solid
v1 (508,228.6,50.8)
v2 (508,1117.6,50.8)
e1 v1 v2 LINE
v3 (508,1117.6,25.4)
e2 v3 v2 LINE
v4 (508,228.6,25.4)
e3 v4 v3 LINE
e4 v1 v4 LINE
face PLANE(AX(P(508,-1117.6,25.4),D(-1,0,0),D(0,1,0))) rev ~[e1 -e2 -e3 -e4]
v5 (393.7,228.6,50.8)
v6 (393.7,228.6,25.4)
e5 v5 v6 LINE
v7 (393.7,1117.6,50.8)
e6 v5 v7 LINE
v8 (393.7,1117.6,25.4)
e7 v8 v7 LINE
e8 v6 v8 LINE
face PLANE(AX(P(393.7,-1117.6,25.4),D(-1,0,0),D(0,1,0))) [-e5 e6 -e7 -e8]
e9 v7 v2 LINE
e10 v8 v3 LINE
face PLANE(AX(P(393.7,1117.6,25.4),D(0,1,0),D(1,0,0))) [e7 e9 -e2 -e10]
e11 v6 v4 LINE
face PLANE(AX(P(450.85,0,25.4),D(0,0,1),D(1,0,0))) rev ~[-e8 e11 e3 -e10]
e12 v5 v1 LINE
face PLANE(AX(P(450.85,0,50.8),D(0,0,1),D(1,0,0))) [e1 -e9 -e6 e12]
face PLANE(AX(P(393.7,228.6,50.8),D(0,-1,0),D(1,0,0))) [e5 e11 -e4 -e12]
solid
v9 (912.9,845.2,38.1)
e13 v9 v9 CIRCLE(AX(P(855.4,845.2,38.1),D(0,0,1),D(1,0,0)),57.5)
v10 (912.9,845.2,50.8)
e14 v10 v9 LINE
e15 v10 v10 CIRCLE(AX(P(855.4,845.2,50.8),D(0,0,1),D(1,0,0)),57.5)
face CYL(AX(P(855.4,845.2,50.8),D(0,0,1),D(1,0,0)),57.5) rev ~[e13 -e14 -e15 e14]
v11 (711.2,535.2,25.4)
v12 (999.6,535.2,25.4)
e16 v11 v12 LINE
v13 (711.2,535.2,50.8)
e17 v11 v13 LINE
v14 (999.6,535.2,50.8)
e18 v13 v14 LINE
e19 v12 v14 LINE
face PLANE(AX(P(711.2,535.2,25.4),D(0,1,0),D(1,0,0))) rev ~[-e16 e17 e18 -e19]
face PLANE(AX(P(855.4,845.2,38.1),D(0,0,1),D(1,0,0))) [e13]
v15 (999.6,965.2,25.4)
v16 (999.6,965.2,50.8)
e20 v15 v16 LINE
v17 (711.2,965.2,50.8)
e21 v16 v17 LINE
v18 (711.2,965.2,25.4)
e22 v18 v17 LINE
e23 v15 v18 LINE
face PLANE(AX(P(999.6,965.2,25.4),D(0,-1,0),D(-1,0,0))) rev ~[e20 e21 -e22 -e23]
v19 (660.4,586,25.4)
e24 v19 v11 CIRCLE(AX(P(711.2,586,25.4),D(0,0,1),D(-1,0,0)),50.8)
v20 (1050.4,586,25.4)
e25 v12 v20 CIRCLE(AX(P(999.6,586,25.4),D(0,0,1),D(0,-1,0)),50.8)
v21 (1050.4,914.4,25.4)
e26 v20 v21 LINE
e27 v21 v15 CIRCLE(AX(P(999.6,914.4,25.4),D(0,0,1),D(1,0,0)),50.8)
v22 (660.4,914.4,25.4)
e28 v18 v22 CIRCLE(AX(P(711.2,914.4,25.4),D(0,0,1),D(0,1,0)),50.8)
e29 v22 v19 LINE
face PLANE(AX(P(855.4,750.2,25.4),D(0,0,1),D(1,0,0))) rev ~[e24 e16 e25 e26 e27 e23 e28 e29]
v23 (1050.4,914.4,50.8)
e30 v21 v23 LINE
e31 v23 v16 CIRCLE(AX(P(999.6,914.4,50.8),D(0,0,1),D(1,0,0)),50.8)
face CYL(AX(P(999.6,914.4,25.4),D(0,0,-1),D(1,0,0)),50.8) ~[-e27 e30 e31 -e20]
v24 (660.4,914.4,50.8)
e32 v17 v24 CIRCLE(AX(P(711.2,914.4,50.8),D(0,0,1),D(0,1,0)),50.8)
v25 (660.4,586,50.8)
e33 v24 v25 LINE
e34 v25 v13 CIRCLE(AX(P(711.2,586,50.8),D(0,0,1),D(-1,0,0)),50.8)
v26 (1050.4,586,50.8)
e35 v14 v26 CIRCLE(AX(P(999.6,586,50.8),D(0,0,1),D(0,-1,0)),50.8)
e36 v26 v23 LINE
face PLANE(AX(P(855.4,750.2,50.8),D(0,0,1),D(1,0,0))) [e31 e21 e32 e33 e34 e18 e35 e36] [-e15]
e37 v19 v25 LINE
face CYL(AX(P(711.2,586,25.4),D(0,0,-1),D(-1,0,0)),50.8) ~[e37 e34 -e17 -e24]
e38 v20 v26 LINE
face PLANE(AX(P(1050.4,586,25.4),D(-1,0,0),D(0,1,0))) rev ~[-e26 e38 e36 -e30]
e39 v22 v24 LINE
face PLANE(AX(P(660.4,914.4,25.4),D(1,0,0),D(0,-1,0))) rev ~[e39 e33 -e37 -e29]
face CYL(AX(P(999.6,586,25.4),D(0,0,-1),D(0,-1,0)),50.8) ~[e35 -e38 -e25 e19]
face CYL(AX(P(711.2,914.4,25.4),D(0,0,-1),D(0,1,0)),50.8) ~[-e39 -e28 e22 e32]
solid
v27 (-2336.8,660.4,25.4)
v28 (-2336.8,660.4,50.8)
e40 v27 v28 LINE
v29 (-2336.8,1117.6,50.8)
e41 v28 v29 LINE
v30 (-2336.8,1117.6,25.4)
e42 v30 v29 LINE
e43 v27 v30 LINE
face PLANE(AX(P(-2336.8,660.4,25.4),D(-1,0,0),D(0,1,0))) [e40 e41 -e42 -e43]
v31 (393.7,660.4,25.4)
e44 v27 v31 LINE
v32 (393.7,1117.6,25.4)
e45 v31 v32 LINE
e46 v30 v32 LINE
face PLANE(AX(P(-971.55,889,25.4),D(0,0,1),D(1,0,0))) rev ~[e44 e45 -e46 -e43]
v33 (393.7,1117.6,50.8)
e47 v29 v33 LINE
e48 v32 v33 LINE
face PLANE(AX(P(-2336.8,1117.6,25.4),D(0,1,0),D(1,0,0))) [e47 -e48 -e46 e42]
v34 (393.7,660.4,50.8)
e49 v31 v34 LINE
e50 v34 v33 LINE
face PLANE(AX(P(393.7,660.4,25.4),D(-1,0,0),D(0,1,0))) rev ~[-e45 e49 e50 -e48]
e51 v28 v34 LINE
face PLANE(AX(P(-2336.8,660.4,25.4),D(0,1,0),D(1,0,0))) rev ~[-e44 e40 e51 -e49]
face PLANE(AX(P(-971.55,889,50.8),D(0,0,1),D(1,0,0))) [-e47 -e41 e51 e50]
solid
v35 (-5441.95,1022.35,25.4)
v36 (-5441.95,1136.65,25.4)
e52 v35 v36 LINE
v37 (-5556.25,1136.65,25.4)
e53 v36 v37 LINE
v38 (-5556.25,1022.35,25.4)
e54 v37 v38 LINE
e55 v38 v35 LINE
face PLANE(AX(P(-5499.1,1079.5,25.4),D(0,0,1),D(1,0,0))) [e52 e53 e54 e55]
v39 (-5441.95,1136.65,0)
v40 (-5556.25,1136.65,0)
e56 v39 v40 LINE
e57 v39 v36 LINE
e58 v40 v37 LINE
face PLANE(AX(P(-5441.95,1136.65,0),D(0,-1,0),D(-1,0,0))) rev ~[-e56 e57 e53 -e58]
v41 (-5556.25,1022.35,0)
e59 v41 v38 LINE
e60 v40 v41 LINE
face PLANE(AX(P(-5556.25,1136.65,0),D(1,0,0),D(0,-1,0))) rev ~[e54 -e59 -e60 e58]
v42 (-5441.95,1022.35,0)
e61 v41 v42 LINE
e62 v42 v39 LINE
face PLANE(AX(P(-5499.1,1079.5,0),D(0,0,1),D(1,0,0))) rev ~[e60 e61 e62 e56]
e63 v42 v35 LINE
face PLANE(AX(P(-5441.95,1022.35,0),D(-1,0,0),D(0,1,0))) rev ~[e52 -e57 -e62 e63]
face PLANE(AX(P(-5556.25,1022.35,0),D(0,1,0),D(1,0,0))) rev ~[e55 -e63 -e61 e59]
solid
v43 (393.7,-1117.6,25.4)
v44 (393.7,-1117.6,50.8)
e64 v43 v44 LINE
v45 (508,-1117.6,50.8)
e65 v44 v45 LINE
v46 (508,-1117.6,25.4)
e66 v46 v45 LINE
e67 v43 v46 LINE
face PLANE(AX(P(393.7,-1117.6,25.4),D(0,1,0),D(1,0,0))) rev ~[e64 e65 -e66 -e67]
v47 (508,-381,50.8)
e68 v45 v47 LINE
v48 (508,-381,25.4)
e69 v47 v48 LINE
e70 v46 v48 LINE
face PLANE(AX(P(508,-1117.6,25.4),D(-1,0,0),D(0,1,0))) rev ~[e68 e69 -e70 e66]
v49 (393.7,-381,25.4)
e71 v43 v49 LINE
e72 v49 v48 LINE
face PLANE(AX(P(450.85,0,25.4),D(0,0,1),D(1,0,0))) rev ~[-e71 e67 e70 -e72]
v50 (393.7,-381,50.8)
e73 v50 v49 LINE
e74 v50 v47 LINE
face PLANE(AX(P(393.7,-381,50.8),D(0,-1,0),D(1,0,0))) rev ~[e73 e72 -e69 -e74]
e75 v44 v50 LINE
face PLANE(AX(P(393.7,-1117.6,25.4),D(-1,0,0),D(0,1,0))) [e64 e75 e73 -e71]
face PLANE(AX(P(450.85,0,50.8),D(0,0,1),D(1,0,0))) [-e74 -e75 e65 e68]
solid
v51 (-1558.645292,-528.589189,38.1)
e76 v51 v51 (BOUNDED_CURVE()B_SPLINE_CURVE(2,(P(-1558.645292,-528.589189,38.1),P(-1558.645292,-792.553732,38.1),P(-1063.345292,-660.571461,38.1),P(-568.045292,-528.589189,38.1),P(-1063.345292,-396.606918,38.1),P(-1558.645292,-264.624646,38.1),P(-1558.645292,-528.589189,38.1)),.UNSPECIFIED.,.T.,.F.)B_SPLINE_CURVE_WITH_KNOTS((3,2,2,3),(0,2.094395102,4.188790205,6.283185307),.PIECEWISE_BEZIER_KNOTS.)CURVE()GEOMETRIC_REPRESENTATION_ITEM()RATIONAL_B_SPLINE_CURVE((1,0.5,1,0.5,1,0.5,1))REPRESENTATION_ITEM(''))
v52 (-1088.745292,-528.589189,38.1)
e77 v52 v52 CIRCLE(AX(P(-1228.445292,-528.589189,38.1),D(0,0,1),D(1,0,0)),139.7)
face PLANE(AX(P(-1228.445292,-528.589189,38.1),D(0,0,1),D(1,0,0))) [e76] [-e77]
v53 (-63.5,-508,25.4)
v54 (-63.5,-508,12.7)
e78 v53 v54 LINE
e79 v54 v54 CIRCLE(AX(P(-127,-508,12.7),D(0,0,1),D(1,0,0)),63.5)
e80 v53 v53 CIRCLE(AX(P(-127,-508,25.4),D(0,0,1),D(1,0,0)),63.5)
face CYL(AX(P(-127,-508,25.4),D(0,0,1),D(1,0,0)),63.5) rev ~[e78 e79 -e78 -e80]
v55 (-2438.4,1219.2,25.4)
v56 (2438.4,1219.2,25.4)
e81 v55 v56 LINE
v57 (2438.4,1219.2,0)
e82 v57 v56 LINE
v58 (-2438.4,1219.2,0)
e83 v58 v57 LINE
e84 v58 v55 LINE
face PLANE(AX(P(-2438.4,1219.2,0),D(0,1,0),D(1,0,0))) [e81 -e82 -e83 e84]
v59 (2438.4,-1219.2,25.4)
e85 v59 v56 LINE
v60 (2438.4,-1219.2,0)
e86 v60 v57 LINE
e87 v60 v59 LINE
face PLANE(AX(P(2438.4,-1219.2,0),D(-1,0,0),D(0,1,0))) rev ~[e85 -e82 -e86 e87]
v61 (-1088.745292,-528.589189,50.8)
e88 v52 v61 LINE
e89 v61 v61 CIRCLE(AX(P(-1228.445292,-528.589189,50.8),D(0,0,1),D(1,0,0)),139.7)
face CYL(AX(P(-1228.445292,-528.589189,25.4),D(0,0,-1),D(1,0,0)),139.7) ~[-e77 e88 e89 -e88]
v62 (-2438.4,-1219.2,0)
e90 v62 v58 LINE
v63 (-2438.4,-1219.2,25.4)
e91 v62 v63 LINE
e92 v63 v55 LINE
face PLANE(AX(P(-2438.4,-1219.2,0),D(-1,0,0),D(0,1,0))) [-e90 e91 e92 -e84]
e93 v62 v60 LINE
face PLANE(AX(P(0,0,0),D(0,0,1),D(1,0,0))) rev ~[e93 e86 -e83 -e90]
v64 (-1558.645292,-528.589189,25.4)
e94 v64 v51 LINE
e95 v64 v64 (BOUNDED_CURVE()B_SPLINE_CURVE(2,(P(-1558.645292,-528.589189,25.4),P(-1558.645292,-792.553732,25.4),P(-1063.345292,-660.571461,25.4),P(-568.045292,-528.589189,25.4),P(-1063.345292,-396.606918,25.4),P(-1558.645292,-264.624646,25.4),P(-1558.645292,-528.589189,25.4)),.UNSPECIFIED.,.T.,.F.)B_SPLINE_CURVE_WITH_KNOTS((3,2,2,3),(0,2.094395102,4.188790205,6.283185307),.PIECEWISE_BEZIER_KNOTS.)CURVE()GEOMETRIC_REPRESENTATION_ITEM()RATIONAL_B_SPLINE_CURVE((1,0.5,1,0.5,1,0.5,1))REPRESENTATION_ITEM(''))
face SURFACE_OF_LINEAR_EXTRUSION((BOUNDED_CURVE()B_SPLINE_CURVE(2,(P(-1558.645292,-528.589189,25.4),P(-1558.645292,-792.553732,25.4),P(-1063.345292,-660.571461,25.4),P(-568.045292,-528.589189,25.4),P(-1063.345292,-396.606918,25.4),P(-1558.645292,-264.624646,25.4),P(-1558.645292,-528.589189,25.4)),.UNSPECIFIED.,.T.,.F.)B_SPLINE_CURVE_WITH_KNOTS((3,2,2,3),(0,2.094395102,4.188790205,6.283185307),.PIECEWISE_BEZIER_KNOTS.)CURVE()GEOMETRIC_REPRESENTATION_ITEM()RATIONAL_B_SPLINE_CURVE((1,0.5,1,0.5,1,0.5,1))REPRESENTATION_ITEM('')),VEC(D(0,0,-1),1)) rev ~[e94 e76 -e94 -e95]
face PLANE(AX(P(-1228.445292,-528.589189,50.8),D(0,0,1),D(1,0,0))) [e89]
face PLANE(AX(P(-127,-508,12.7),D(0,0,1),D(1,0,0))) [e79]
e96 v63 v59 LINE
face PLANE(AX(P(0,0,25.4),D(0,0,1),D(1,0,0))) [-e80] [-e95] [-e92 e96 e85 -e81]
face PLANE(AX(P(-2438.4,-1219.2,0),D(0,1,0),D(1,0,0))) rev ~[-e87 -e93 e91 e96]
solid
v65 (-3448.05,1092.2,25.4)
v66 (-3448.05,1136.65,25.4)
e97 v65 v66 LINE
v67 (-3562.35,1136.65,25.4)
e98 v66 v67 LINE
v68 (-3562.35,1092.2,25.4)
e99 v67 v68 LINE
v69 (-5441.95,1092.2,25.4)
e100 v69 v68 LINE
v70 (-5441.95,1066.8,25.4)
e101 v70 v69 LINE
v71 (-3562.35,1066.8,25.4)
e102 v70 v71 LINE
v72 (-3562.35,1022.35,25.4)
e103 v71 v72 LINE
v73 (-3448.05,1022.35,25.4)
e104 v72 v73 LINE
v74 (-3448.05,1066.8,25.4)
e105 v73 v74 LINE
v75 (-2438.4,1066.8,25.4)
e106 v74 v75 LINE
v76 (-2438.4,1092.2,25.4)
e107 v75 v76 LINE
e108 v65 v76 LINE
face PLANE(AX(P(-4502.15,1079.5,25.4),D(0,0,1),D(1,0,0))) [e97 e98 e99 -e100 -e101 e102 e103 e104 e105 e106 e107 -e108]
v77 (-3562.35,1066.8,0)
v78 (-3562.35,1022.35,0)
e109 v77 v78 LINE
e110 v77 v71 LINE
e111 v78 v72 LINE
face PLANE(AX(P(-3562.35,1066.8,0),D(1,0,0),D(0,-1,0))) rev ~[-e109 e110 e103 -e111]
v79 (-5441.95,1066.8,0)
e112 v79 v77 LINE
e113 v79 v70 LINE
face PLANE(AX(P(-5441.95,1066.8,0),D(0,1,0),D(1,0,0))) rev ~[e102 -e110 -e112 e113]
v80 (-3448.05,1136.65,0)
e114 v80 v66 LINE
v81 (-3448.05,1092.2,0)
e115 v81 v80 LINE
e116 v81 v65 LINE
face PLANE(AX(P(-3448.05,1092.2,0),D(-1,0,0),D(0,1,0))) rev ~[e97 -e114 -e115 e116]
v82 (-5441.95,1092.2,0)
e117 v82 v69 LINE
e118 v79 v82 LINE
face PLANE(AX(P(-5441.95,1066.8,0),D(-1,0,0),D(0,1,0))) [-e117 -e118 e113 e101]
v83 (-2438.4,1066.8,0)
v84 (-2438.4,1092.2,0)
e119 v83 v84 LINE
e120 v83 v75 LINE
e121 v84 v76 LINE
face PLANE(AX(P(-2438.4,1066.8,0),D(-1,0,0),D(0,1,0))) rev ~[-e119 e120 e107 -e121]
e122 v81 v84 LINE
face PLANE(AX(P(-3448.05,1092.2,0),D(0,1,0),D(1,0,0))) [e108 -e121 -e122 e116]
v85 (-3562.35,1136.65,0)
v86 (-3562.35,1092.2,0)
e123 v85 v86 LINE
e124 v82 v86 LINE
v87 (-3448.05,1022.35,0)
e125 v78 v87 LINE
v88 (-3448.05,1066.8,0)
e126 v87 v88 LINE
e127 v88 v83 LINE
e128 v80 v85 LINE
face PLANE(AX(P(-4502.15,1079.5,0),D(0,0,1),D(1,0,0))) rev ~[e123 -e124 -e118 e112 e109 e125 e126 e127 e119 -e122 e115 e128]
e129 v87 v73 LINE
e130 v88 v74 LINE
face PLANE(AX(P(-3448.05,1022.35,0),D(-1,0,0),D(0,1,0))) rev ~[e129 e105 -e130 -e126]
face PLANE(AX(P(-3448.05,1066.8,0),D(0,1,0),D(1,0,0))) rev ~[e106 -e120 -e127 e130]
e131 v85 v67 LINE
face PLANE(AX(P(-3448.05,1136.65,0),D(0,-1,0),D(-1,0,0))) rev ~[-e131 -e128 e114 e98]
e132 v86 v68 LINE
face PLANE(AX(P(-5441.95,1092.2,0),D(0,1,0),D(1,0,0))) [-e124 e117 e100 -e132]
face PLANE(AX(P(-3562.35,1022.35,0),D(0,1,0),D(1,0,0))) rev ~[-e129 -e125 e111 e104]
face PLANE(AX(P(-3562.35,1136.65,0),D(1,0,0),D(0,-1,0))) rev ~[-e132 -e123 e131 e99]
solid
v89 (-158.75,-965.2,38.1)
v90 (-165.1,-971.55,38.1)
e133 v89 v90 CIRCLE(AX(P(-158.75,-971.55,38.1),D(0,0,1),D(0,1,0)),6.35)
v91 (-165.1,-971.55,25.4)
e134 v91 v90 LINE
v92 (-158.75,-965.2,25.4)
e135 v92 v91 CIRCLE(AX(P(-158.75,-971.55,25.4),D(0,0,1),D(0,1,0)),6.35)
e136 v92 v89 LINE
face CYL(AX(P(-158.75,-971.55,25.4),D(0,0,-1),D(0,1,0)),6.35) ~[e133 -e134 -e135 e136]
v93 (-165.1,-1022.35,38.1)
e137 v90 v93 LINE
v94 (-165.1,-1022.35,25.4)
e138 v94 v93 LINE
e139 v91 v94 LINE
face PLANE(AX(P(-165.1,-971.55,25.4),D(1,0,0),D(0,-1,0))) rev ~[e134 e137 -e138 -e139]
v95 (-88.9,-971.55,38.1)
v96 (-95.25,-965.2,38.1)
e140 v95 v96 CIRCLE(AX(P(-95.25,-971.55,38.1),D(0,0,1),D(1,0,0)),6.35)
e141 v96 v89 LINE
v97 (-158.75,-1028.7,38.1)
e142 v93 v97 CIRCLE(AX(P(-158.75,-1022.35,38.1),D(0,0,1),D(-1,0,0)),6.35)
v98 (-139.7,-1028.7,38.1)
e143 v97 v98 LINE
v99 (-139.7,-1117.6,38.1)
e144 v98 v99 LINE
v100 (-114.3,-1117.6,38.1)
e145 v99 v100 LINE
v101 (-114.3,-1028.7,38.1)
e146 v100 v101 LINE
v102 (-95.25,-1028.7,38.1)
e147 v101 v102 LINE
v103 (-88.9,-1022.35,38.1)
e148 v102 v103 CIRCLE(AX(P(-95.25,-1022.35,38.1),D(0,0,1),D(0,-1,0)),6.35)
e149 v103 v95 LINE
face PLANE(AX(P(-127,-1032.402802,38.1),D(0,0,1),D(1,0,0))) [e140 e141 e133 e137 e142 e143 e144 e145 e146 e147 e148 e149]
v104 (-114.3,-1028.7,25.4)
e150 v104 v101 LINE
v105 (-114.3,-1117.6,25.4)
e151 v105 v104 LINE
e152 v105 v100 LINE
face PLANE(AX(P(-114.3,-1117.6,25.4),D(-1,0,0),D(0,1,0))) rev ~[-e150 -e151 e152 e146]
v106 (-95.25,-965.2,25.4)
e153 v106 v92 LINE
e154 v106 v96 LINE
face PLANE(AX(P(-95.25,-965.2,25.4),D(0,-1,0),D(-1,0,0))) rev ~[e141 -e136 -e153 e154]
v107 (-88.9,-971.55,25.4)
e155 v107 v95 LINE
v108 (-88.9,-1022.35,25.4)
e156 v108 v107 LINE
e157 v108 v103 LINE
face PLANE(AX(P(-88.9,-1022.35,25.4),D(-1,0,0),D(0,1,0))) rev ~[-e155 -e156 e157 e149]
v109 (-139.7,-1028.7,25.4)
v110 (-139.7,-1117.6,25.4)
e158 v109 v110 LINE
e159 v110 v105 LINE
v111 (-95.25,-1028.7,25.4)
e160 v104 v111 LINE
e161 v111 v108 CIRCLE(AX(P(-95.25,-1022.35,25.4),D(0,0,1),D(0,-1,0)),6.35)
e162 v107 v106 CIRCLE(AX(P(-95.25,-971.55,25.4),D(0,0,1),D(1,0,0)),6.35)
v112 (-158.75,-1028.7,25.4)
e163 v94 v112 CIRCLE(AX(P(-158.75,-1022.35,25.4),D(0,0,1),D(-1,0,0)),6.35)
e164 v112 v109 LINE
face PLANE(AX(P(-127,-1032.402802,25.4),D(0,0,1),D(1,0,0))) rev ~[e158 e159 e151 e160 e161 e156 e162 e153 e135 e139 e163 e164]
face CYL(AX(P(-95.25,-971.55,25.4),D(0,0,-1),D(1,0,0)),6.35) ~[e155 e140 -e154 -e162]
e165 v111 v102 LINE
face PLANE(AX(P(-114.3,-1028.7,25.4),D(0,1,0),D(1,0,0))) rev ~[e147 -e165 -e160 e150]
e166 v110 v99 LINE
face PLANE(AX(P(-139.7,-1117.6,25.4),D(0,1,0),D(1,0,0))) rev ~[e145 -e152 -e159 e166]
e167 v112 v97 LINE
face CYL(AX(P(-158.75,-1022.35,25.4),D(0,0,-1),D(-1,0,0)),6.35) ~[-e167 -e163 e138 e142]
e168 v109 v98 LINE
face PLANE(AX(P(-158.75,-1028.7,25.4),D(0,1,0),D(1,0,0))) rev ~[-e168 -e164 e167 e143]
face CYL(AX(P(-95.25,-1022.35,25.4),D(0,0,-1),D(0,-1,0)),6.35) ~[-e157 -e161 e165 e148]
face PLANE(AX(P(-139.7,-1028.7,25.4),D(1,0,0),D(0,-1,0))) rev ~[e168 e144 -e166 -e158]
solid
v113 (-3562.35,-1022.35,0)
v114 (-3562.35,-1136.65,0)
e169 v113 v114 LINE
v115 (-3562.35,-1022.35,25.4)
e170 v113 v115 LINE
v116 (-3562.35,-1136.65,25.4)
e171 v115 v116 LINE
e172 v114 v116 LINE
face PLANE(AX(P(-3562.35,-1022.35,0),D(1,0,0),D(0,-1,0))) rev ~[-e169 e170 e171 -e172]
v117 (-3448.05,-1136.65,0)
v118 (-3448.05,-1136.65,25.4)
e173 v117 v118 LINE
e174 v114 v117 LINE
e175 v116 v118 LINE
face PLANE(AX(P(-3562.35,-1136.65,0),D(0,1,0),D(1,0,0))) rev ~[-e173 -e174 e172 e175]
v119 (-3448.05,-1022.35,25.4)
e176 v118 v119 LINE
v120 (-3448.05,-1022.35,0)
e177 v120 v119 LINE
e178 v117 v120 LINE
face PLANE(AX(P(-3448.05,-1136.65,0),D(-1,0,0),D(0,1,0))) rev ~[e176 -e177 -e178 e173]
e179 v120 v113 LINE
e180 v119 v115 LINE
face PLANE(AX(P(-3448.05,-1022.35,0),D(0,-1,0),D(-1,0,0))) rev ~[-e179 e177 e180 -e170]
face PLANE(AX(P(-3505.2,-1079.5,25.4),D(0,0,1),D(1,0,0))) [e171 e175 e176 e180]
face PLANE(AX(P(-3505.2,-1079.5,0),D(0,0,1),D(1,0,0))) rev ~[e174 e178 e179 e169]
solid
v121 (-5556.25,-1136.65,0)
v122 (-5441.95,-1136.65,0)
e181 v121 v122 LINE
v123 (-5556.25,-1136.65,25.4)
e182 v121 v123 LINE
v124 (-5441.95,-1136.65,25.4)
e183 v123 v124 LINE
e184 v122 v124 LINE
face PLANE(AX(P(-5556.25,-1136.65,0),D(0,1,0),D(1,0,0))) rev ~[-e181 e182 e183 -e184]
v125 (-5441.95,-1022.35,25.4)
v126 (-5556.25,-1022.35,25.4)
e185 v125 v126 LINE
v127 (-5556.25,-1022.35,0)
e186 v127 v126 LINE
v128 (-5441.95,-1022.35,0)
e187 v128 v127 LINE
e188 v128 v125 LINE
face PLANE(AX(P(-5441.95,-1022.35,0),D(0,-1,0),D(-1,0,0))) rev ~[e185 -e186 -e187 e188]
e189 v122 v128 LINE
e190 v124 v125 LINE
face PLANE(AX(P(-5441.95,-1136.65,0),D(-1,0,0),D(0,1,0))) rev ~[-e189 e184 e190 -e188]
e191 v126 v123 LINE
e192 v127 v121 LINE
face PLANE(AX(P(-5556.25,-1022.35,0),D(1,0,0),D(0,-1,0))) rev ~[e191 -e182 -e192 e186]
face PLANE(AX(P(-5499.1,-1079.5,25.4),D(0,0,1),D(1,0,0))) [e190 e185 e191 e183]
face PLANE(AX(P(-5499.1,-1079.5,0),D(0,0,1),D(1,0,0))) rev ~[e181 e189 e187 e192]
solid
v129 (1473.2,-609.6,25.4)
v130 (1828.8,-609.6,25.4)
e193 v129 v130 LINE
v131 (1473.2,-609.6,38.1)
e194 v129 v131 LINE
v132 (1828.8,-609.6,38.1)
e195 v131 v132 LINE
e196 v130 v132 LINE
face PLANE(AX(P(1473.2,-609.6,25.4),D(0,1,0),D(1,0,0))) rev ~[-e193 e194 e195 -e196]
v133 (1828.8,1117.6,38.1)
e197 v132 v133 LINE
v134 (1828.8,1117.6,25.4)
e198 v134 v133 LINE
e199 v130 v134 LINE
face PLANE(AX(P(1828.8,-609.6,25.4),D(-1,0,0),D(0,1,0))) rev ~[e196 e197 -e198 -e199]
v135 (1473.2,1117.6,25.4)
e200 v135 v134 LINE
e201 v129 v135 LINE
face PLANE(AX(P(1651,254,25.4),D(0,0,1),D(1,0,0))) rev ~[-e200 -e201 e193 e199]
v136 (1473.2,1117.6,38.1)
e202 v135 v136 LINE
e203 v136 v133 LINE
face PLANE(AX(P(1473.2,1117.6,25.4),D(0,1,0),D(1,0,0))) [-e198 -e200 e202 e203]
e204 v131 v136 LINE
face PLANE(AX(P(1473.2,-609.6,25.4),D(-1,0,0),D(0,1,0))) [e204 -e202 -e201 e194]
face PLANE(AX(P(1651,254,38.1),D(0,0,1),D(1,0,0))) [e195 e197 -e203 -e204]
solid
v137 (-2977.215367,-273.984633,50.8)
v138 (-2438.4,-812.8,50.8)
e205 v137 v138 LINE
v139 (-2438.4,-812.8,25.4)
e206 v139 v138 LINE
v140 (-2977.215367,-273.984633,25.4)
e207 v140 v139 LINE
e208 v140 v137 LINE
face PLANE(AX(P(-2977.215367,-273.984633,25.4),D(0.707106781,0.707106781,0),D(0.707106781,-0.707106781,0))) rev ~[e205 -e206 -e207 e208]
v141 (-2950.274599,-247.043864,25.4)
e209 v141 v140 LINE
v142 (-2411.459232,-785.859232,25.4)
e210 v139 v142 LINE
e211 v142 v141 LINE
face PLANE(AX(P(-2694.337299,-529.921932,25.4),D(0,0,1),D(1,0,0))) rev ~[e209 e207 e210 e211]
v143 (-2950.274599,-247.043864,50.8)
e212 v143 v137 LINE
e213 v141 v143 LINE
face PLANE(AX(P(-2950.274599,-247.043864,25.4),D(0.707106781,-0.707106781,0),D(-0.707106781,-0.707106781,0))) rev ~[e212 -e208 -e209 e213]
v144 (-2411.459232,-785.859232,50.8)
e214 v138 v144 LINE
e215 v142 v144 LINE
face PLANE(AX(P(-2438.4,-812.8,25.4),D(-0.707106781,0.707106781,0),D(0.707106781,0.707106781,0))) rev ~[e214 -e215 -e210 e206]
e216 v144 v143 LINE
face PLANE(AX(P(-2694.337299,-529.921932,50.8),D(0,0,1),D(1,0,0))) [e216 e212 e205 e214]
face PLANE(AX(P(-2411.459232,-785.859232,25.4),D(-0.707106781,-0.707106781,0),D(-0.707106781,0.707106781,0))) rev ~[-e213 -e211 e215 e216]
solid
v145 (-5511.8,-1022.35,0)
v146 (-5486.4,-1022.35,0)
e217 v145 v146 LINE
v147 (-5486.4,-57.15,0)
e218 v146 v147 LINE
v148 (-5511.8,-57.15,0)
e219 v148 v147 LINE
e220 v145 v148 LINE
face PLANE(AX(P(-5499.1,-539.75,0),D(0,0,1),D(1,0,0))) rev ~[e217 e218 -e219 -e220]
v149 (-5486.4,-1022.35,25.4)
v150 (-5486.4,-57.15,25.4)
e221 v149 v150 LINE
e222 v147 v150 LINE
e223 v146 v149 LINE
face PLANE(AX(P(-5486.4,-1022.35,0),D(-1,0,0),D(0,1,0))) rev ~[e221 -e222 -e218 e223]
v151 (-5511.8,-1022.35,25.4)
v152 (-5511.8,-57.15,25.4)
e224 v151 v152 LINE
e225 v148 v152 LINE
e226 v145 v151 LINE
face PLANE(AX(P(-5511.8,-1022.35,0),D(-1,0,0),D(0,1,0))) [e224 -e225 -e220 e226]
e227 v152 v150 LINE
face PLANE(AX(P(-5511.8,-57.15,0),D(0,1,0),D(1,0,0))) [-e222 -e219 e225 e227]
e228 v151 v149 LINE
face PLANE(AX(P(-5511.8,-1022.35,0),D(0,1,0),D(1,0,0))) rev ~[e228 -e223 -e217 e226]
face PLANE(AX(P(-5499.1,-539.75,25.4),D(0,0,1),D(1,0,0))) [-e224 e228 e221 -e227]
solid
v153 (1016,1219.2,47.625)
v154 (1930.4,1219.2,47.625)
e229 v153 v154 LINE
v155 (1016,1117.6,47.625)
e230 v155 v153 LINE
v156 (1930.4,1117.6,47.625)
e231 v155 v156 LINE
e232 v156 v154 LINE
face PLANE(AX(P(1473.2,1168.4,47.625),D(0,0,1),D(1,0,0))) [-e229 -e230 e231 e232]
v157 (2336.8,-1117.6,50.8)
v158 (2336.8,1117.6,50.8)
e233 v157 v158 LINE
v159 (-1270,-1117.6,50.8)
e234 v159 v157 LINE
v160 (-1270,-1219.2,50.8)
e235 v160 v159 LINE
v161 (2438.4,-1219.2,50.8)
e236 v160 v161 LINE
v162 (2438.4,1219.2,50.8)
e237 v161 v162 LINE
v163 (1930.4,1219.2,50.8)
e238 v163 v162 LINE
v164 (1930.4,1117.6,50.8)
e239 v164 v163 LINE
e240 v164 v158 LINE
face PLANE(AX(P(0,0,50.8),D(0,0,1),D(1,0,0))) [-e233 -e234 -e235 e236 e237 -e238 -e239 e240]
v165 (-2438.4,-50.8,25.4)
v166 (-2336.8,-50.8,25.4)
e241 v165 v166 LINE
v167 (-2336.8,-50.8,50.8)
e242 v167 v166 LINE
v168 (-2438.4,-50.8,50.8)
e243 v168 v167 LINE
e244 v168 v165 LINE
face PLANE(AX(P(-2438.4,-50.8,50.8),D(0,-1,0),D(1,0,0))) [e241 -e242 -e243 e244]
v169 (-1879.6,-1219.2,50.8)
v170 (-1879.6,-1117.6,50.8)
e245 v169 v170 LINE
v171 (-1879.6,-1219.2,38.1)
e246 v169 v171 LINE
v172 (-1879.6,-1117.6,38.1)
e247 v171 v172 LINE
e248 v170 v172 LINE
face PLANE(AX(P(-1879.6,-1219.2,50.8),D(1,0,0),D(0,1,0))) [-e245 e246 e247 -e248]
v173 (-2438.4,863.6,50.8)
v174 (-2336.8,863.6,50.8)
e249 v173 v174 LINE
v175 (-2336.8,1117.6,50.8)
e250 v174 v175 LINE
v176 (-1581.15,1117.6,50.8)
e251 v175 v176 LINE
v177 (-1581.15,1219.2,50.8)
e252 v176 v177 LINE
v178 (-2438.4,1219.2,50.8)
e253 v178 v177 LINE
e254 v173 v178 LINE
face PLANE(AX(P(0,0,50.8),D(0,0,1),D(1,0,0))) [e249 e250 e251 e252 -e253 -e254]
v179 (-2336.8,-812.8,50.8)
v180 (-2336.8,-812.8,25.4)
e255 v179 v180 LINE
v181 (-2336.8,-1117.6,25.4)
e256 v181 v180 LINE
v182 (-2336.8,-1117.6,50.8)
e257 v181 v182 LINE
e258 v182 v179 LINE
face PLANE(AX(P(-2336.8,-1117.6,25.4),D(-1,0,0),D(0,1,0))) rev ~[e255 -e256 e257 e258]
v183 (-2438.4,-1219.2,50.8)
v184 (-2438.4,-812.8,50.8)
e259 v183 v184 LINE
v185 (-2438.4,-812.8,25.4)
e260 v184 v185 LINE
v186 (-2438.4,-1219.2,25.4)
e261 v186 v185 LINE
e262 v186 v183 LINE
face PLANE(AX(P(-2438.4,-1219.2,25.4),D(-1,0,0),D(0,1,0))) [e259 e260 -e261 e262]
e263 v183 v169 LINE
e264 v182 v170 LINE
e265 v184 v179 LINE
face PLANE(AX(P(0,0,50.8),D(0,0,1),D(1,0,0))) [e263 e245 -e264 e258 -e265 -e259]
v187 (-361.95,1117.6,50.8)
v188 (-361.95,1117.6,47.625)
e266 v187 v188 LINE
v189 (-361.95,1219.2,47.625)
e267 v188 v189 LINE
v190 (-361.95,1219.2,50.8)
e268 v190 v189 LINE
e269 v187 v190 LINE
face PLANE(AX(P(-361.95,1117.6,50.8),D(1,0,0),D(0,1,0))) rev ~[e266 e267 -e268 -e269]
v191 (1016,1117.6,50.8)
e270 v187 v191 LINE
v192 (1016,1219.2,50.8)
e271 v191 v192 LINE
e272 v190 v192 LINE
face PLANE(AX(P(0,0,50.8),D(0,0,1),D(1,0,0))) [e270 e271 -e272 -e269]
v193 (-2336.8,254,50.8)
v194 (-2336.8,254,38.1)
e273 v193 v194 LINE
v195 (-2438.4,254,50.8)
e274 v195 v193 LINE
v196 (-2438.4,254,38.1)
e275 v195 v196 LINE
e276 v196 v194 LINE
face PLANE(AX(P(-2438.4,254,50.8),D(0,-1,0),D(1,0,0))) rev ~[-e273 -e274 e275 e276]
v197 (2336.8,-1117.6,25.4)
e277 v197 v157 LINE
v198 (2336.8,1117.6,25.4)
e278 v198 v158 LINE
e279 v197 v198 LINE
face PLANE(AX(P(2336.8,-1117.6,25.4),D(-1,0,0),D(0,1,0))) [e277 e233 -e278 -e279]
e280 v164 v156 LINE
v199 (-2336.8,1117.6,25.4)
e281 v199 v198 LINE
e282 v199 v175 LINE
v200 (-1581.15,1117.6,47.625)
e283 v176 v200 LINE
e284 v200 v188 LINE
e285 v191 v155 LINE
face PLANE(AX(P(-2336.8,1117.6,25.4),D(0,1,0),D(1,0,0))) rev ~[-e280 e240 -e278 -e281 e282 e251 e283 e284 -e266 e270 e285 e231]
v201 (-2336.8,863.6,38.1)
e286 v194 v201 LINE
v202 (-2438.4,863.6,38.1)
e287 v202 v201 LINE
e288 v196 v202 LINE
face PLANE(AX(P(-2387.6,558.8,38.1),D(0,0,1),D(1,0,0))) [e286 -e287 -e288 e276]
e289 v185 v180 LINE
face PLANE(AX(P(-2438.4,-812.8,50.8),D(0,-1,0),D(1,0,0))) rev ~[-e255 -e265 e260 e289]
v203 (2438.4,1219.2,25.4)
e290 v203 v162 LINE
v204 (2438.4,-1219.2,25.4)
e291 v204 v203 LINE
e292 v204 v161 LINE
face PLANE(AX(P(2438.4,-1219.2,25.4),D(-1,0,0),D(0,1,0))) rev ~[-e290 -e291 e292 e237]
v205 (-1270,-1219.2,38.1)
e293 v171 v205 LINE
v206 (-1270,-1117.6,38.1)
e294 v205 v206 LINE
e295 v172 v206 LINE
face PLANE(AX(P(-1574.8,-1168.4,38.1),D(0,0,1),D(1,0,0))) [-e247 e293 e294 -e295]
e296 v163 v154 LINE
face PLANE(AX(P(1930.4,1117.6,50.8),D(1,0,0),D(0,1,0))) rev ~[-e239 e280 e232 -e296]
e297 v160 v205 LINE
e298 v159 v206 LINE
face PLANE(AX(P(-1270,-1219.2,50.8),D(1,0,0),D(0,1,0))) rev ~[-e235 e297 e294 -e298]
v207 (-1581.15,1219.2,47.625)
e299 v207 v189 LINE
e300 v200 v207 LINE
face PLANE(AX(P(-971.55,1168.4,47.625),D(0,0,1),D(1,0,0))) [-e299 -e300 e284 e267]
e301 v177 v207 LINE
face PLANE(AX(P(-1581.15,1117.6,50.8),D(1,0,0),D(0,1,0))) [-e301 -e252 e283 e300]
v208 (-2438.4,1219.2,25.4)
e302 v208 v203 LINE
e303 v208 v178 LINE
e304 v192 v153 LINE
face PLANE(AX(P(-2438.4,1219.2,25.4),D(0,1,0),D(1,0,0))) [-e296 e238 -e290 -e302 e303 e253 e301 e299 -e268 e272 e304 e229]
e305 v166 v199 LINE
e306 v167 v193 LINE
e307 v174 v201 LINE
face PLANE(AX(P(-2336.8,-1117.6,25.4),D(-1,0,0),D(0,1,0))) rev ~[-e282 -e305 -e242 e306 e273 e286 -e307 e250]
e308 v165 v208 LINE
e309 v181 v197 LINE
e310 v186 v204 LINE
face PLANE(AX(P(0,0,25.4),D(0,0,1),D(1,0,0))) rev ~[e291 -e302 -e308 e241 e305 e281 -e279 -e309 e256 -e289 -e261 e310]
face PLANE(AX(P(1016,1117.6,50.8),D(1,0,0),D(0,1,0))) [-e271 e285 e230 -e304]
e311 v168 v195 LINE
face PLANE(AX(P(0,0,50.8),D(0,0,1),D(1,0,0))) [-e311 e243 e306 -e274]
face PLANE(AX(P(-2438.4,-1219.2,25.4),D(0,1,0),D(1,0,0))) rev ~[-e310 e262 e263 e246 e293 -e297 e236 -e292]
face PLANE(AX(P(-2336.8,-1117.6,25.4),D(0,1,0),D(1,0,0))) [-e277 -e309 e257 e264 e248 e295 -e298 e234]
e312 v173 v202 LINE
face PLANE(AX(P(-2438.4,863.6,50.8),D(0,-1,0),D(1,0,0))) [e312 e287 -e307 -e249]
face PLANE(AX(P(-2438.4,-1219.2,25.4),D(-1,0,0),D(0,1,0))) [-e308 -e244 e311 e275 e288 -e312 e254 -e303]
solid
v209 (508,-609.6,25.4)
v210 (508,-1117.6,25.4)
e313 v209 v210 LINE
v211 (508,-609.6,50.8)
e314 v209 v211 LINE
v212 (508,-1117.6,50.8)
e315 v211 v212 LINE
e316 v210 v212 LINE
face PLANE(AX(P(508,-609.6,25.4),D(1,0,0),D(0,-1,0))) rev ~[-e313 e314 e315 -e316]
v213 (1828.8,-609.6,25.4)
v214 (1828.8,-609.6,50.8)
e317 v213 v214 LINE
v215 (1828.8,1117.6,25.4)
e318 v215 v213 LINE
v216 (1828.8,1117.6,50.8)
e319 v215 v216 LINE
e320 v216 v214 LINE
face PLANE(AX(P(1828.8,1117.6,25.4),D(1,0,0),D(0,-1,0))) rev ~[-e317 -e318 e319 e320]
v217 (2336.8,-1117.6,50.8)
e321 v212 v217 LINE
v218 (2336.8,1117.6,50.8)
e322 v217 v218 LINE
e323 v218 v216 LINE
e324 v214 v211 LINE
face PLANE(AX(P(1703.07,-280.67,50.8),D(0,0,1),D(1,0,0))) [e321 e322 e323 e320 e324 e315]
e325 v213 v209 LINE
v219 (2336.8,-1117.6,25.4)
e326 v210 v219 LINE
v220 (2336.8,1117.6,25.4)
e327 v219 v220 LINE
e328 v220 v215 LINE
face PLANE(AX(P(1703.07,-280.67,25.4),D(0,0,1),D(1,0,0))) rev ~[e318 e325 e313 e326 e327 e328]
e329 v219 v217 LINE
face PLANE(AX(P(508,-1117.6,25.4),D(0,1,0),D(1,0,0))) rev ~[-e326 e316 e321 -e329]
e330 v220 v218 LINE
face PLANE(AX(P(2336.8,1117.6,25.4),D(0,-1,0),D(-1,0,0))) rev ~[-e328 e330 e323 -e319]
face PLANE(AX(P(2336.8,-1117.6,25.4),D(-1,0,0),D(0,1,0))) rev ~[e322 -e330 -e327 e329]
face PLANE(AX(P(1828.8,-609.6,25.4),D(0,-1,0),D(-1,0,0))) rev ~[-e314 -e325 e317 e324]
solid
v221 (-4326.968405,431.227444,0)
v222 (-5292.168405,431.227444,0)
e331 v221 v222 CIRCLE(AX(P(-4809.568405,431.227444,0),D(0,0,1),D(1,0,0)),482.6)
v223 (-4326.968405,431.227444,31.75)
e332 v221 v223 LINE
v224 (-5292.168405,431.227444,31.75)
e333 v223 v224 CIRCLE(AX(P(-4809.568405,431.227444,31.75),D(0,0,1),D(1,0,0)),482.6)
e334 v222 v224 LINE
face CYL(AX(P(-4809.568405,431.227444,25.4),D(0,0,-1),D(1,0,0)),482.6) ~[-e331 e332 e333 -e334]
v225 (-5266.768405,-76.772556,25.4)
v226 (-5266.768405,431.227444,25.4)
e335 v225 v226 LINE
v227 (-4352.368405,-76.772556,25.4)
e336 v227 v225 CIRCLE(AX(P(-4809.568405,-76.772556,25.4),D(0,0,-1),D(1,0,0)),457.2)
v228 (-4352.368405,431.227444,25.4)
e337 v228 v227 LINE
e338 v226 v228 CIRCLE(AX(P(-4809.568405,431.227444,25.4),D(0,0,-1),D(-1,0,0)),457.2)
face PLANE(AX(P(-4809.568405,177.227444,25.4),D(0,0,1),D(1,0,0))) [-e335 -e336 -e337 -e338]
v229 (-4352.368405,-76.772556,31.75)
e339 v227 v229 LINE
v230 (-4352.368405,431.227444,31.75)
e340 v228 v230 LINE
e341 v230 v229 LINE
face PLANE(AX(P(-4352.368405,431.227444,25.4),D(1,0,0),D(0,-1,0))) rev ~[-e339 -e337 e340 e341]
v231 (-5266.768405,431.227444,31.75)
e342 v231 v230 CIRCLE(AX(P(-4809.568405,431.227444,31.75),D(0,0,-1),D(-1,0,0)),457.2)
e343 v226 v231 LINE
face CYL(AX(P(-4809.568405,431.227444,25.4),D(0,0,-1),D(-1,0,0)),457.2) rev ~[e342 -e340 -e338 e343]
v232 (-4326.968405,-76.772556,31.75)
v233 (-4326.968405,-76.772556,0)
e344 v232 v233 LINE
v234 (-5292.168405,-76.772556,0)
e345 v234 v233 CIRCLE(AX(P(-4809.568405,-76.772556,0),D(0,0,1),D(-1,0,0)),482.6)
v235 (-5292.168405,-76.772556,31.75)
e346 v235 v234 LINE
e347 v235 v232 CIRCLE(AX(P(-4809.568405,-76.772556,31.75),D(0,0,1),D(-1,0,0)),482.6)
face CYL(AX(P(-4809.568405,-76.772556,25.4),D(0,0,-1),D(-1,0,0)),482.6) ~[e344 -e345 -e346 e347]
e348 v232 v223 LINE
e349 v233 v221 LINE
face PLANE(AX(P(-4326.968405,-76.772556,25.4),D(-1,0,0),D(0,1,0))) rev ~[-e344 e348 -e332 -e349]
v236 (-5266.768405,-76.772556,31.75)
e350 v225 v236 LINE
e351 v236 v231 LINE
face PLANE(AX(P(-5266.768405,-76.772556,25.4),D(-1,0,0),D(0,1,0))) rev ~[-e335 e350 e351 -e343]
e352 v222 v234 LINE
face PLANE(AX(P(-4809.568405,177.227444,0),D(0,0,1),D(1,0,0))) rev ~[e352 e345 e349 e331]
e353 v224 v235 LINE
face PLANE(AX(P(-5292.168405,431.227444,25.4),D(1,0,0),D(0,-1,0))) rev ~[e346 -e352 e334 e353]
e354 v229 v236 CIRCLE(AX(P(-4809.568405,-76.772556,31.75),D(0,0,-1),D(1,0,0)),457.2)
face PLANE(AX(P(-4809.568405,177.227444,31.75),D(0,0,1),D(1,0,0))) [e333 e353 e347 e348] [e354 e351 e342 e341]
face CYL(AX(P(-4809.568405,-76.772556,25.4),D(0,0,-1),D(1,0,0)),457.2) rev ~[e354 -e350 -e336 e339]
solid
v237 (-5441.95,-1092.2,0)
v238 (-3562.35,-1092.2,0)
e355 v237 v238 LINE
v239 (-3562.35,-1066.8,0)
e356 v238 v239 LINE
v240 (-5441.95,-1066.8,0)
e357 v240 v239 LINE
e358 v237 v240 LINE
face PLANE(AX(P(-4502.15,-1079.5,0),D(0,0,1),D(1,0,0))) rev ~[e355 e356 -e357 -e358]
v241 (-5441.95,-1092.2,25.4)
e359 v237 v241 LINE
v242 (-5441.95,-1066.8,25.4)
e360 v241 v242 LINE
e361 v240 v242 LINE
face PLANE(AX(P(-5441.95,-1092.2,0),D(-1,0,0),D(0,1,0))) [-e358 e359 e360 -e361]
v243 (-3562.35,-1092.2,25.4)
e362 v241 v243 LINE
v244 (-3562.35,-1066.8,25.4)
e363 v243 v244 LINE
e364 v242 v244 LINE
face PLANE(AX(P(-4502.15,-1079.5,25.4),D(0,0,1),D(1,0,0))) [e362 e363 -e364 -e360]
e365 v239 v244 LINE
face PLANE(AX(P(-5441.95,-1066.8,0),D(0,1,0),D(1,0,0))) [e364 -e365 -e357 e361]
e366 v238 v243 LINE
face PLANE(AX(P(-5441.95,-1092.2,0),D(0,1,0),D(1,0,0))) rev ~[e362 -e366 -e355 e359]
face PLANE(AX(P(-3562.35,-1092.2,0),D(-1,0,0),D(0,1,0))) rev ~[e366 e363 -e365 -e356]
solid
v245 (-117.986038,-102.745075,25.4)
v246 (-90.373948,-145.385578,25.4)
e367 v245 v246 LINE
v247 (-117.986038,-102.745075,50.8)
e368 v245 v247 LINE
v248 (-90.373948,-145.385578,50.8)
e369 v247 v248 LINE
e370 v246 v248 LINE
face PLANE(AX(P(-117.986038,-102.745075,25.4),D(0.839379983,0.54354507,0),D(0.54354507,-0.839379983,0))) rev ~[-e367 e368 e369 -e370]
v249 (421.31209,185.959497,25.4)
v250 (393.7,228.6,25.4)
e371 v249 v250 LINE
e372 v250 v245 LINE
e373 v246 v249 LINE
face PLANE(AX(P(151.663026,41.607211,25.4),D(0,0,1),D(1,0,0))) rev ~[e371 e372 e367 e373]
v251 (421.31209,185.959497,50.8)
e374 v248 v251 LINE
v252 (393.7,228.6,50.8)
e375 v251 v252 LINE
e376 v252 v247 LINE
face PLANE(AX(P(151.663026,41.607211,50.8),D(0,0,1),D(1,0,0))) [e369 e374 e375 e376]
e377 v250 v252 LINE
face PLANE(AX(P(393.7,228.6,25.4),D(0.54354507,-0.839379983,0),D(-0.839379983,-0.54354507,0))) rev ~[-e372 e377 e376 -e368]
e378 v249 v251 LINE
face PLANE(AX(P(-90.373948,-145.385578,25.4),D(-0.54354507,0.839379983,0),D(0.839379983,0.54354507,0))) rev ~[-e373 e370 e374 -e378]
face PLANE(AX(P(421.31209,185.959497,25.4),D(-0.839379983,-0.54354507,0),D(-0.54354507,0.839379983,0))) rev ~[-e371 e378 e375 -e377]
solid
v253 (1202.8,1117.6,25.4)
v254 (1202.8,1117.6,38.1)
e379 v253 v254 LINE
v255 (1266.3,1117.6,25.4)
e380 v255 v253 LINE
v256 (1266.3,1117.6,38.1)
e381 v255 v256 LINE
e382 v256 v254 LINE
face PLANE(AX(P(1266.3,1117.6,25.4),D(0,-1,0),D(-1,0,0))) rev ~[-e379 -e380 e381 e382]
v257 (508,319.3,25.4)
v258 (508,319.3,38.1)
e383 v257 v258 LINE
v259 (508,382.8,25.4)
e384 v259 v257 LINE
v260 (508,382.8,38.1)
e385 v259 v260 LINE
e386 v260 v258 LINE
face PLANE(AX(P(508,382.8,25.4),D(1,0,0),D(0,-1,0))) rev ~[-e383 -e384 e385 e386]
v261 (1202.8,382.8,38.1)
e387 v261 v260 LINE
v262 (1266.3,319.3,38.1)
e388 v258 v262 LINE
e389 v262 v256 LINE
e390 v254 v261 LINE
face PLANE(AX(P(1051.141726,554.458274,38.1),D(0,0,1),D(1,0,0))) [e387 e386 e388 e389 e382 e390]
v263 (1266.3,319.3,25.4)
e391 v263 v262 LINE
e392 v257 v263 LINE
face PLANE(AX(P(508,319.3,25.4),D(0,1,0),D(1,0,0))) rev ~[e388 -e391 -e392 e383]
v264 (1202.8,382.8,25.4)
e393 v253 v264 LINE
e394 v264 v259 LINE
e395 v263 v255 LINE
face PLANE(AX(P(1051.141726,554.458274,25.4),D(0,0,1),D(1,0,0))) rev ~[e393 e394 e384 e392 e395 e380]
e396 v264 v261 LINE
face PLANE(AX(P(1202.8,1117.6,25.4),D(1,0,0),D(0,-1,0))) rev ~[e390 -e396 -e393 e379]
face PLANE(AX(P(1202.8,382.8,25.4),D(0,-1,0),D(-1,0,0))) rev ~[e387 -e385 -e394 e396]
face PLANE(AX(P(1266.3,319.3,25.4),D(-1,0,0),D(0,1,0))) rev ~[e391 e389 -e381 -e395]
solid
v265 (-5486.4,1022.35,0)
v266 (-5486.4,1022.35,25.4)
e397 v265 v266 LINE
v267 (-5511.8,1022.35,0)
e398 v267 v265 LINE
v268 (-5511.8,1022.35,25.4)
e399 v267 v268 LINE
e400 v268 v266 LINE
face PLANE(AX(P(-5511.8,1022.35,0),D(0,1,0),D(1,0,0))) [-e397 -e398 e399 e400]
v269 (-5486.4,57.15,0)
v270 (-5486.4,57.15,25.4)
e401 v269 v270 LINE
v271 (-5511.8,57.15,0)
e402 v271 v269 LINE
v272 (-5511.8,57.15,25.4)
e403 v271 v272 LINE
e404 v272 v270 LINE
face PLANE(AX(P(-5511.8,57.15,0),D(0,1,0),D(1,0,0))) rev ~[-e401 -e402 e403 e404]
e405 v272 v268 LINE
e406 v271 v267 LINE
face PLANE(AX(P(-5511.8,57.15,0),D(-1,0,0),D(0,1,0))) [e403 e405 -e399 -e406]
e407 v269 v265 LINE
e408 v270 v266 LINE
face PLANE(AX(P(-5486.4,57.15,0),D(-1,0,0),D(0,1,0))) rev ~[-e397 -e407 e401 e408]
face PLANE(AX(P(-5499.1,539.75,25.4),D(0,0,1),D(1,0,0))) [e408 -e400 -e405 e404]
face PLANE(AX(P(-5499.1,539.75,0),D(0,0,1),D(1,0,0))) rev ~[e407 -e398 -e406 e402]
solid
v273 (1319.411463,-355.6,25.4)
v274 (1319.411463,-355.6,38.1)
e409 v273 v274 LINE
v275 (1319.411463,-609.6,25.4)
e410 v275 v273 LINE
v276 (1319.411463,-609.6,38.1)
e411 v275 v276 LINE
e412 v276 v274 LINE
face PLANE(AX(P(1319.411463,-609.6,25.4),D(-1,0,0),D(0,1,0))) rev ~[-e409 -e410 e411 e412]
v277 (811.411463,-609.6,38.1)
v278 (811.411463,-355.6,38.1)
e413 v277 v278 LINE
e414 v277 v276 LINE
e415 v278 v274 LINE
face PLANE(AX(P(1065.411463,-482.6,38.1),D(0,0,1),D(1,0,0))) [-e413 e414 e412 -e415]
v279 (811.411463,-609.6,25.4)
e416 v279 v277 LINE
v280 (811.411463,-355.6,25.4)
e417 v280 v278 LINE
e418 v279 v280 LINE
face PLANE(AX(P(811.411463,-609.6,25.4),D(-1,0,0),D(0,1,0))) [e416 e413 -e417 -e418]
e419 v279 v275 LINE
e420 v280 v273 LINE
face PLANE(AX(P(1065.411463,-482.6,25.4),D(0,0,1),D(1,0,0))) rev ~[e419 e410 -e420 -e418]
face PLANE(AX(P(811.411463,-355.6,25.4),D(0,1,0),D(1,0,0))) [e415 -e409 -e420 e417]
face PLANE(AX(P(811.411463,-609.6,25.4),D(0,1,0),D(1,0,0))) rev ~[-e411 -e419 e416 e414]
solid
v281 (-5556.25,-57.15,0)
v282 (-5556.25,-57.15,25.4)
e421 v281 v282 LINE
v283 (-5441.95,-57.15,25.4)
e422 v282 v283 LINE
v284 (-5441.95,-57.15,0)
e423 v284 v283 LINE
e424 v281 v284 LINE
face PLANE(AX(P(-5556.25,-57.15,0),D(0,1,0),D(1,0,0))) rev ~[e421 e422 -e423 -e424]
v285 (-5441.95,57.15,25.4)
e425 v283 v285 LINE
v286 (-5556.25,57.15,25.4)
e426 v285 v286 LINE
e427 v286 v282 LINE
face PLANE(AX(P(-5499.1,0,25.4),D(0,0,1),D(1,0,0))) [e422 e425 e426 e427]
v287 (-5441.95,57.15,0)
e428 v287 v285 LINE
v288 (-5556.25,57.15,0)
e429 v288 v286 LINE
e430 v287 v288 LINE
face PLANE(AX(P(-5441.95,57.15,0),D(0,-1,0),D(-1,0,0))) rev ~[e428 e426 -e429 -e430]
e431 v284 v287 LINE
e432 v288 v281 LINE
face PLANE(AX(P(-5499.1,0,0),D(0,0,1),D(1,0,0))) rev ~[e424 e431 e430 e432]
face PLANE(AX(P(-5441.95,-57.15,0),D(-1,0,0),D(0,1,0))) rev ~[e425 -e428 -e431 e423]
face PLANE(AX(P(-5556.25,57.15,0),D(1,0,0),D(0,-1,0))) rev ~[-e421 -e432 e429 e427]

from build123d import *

# Parameters (mm, degrees)
F0_W      = 4876.8
F0_H      = 2438.4
F1_DEPTH  = 25.4
F2_W      = 4876.8
F2_H      = 2438.4
F2_W_2    = 4673.6
F2_H_2    = 2235.2
F3_DEPTH  = 25.4
F4_W      = 114.3
F4_H      = 2235.2
F5_DEPTH  = 25.4
F6_W      = 114.3
F6_H      = 609.6
F7_DEPTH  = 25.4
F8_W      = 101.6
F8_H      = 762
F9_DEPTH  = 25.4
F11_DEPTH = 25.4
F13_DEPTH = 25.4
F14_W     = 355.6
F14_H     = 1727.2
F15_DEPTH = 12.7
F17_DEPTH = 25.4
F19_DEPTH = 25.4
F20_R     = 63.5
F21_DEPTH = 12.7
F23_DEPTH = 12.7
F24_W     = 2730.5
F24_H     = 457.2
F25_DEPTH = 25.4
F26_W     = 609.6
F26_H     = 101.6
F26_W_2   = 101.6
F26_H_2   = 609.6
F27_DEPTH = 12.7
F28_R     = 57.5
F29_DEPTH = 12.7
F31_DEPTH = 25.4
F30_W     = 1879.6
F30_H     = 25.4
F32_DEPTH = 25.4
F30_W_2   = 25.4
F30_H_2   = 965.2
F30_W_3   = 1009.65
F33_R     = 139.7
F34_DEPTH = 25.4
F35_DEPTH = 12.7
F37_DEPTH = 25.4
F39_DEPTH = 6.35
F40_W     = 1219.2
F40_H     = 101.6
F40_W_2   = 914.4
F41_DEPTH = 3.175
F42_W     = 508
F42_H     = 254
F43_DEPTH = 12.7
F45_DEPTH = 12.7


# Not quite as in the source:
# - a feature names something its author has since deleted; it is built from what else it names


with BuildPart() as f1:
    # F0 (on Top) → F1 (new body)
    with BuildSketch(Plane.XY):
        Rectangle(F0_W, F0_H)
    extrude(amount=F1_DEPTH)

    # F20 (on face) → F21 (cut)
    with BuildSketch(Plane.XY.offset(25.4)):
        with Locations((-127, -508)):
            Circle(F20_R)
    extrude(amount=-F21_DEPTH, mode=Mode.SUBTRACT)

    # F33 (on face) → F34 (join)
    with BuildSketch(Plane.XY.offset(25.4)):
        with Locations((-1228.4452915192, -528.5891890526)):
            Circle(F33_R)
    extrude(amount=F34_DEPTH)

    # F33 (on face) → F35 (join)
    with BuildSketch(Plane.XY.offset(25.4)):
        with BuildLine():
            add(Edge.make_bspline(
                [(-1558.6452915192, -528.5891890526), (-1558.6452915192, -792.5537321261), (-1063.3452915192, -660.5714605893), (-568.0452915192, -528.5891890526), (-1063.3452915192, -396.6069175158), (-1558.6452915192, -264.6246459791), (-1558.6452915192, -528.5891890526)],
                knots=[0, 0, 0, 2.0943951024, 2.0943951024, 4.1887902048, 4.1887902048, 6.2831853072, 6.2831853072, 6.2831853072], degree=2, weights=[1, 0.5, 1, 0.5, 1, 0.5, 1]))
        make_face()
        with Locations((-1228.4452915192, -528.5891890526)):
            Circle(F33_R, mode=Mode.SUBTRACT)
    extrude(amount=F35_DEPTH)


with BuildPart() as f3:
    # F2 (on face) → F3 (new body)
    with BuildSketch(Plane.XY.offset(25.4)):
        Rectangle(F2_W, F2_H)
        Rectangle(F2_W_2, F2_H_2, mode=Mode.SUBTRACT)
    extrude(amount=F3_DEPTH)

    # F8 (on face) → F9 (cut)
    with BuildSketch(Plane.XY.offset(50.8)):
        with Locations((-2387.6, -431.8)):
            Rectangle(F8_W, F8_H)
    extrude(amount=-F9_DEPTH, mode=Mode.SUBTRACT)

    # F26 (on face) → F27 (cut)
    with BuildSketch(Plane.XY.offset(50.8)):
        with Locations((-1574.8, -1168.4)):
            Rectangle(F26_W, F26_H)
        with Locations((-2387.6, 558.8)):
            Rectangle(F26_W_2, F26_H_2)
    extrude(amount=-F27_DEPTH, mode=Mode.SUBTRACT)

    # F40 (on face) → F41 (cut)
    with BuildSketch(Plane.XY.offset(50.8)):
        with Locations((-971.55, 1168.4)):
            Rectangle(F40_W, F40_H)
        with Locations((1473.2, 1168.4)):
            Rectangle(F40_W_2, F40_H)
    extrude(amount=-F41_DEPTH, mode=Mode.SUBTRACT)


with BuildPart() as f5:
    # F4 (on face) → F5 (new body)
    with BuildSketch(Plane.XY.offset(25.4)):
        with Locations((450.85, 0)):
            Rectangle(F4_W, F4_H)
    extrude(amount=F5_DEPTH)

    # F6 (on face) → F7 (cut)
    with BuildSketch(Plane.XY.offset(50.8)):
        with Locations((450.85, -76.2)):
            Rectangle(F6_W, F6_H)
    extrude(amount=-F7_DEPTH, mode=Mode.SUBTRACT)


with BuildPart() as f11:
    # F10 (on face) → F11 (new body)
    with BuildSketch(Plane.XY.offset(25.4)):
        with BuildLine():
            Line((999.6, 965.2), (711.2, 965.2))
            ThreePointArc((711.2, 965.2), (675.2789755157, 950.3210244843), (660.4, 914.4))
            Line((660.4, 914.4), (660.4, 586))
            ThreePointArc((660.4, 586), (675.2789755157, 550.0789755157), (711.2, 535.2))
            Line((711.2, 535.2), (999.6, 535.2))
            ThreePointArc((999.6, 535.2), (1035.5210244843, 550.0789755157), (1050.4, 586))
            Line((1050.4, 586), (1050.4, 914.4))
            ThreePointArc((1050.4, 914.4), (1035.5210244843, 950.3210244843), (999.6, 965.2))
        make_face()
    extrude(amount=F11_DEPTH)

    # F28 (on face) → F29 (cut)
    with BuildSketch(Plane.XY.offset(50.8)):
        with Locations((855.4, 845.2)):
            Circle(F28_R)
    extrude(amount=-F29_DEPTH, mode=Mode.SUBTRACT)


with BuildPart() as f13:
    # F12 (on face) → F13 (new body)
    with BuildSketch(Plane.XY.offset(25.4)):
        Polygon((508, -609.6), (508, -1117.6), (2336.8, -1117.6), (2336.8, 1117.6), (1828.8, 1117.6), (1828.8, -609.6), align=None)
    extrude(amount=F13_DEPTH)


with BuildPart() as f15:
    # F14 (on face) → F15 (new body)
    with BuildSketch(Plane.XY.offset(25.4)):
        with Locations((1651, 254)):
            Rectangle(F14_W, F14_H)
    extrude(amount=F15_DEPTH)


with BuildPart() as f17:
    # F16 (on face) → F17 (new body)
    with BuildSketch(Plane.XY.offset(25.4)):
        Polygon((421.3120895758, 185.9594968457), (393.7, 228.6), (-117.9860378521, -102.7450749101), (-90.3739482763, -145.3855780644), align=None)
    extrude(amount=F17_DEPTH)


with BuildPart() as f19:
    # F18 (on face) → F19 (new body)
    with BuildSketch(Plane.XY.offset(25.4)):
        Polygon((-2438.4, -812.8), (-2411.4592316368, -785.8592316368), (-2950.2745989009, -247.0438643726), (-2977.2153672641, -273.9846327359), align=None)
    extrude(amount=F19_DEPTH)


with BuildPart() as f23:
    # F22 (on face) → F23 (new body)
    with BuildSketch(Plane.XY.offset(25.4)):
        with BuildLine():
            Line((-139.7, -1028.7), (-139.7, -1117.6))
            Line((-139.7, -1117.6), (-114.3, -1117.6))
            Line((-114.3, -1117.6), (-114.3, -1028.7))
            Line((-114.3, -1028.7), (-95.25, -1028.7))
            ThreePointArc((-95.25, -1028.7), (-90.7598719395, -1026.8401280605), (-88.9, -1022.35))
            Line((-88.9, -1022.35), (-88.9, -971.55))
            ThreePointArc((-88.9, -971.55), (-90.7598719395, -967.0598719395), (-95.25, -965.2))
            Line((-95.25, -965.2), (-158.75, -965.2))
            ThreePointArc((-158.75, -965.2), (-163.2401280605, -967.0598719395), (-165.1, -971.55))
            Line((-165.1, -971.55), (-165.1, -1022.35))
            ThreePointArc((-165.1, -1022.35), (-163.2401280605, -1026.8401280605), (-158.75, -1028.7))
            Line((-158.75, -1028.7), (-139.7, -1028.7))
        make_face()
    extrude(amount=F23_DEPTH)


with BuildPart() as f25:
    # F24 (on face) → F25 (new body)
    with BuildSketch(Plane.XY.offset(25.4)):
        with Locations((-971.55, 889)):
            Rectangle(F24_W, F24_H)
    extrude(amount=F25_DEPTH)


with BuildPart() as f31:
    # F30 (on Top) → F31 (new body)
    with BuildSketch(Plane.XY):
        Polygon((-5441.95, -1022.35), (-5486.4, -1022.35), (-5511.8, -1022.35), (-5556.25, -1022.35), (-5556.25, -1136.65), (-5441.95, -1136.65), (-5441.95, -1092.2), (-5441.95, -1066.8), align=None)
    extrude(amount=F31_DEPTH)


with BuildPart() as f31b:
    # F30 (on Top) → F31, piece 2 (new body)
    with BuildSketch(Plane.XY):
        Polygon((-3562.35, -1022.35), (-3562.35, -1066.8), (-3562.35, -1092.2), (-3562.35, -1136.65), (-3448.05, -1136.65), (-3448.05, -1022.35), align=None)
    extrude(amount=F31_DEPTH)


with BuildPart() as f31c:
    # F30 (on Top) → F31, piece 3 (new body)
    with BuildSketch(Plane.XY):
        Polygon((-5441.95, 57.15), (-5486.4, 57.15), (-5511.8, 57.15), (-5556.25, 57.15), (-5556.25, -57.15), (-5511.8, -57.15), (-5486.4, -57.15), (-5441.95, -57.15), align=None)
    extrude(amount=F31_DEPTH)


with BuildPart() as f31d:
    # F30 (on Top) → F31, piece 4 (new body)
    with BuildSketch(Plane.XY):
        Polygon((-5486.4, 1022.35), (-5441.95, 1022.35), (-5441.95, 1066.8), (-5441.95, 1092.2), (-5441.95, 1136.65), (-5556.25, 1136.65), (-5556.25, 1022.35), (-5511.8, 1022.35), align=None)
    extrude(amount=F31_DEPTH)


with BuildPart() as f32:
    # F30 (on Top) → F32 (new body)
    with BuildSketch(Plane.XY):
        with Locations((-4502.15, -1079.5)):
            Rectangle(F30_W, F30_H)
    extrude(amount=F32_DEPTH)


with BuildPart() as f32b:
    # F30 (on Top) → F32, piece 2 (new body)
    with BuildSketch(Plane.XY):
        with Locations((-5499.1, -539.75)):
            Rectangle(F30_W_2, F30_H_2)
    extrude(amount=F32_DEPTH)


with BuildPart() as f32c:
    # F30 (on Top) → F32, piece 3 (new body)
    with BuildSketch(Plane.XY):
        with Locations((-5499.1, 539.75)):
            Rectangle(F30_W_2, F30_H_2)
    extrude(amount=F32_DEPTH)


with BuildPart() as f32d:
    # F30 (on Top) → F32, piece 4 (new body)
    with BuildSketch(Plane.XY):
        with Locations((-4502.15, 1079.5)):
            Rectangle(F30_W, F30_H)
        Polygon((-3562.35, 1092.2), (-3562.35, 1066.8), (-3562.35, 1022.35), (-3448.05, 1022.35), (-3448.05, 1066.8), (-3448.05, 1092.2), (-3448.05, 1136.65), (-3562.35, 1136.65), align=None)
        with Locations((-2943.225, 1079.5)):
            Rectangle(F30_W_3, F30_H)
    extrude(amount=F32_DEPTH)


with BuildPart() as f37:
    # F36 (on Top) → F37 (new body)
    with BuildSketch(Plane.XY):
        with BuildLine():
            ThreePointArc((-4809.5684051514, 913.8274442911), (-5150.818137752, 772.4771768917), (-5292.1684051514, 431.2274442911))
            Line((-5292.1684051514, 431.2274442911), (-5292.1684051514, -76.7725557089))
            ThreePointArc((-5292.1684051514, -76.7725557089), (-5150.818137752, -418.0222883095), (-4809.5684051514, -559.3725557089))
            ThreePointArc((-4809.5684051514, -559.3725557089), (-4468.3186725507, -418.0222883095), (-4326.9684051514, -76.7725557089))
            Line((-4326.9684051514, -76.7725557089), (-4326.9684051514, 431.2274442911))
            ThreePointArc((-4326.9684051514, 431.2274442911), (-4468.3186725507, 772.4771768917), (-4809.5684051514, 913.8274442911))
        make_face()
    extrude(amount=F37_DEPTH)

    # F38 (on face) → F39 (join)
    with BuildSketch(Plane.XY.offset(25.4)):
        with BuildLine():
            Line((-4326.9684051514, -76.7725557089), (-4326.9684051514, 431.2274442911))
            ThreePointArc((-4326.9684051514, 431.2274442911), (-4809.5684051514, 913.8274442911), (-5292.1684051514, 431.2274442911))
            Line((-5292.1684051514, 431.2274442911), (-5292.1684051514, -76.7725557089))
            ThreePointArc((-5292.1684051514, -76.7725557089), (-4809.5684051514, -559.3725557089), (-4326.9684051514, -76.7725557089))
        make_face()
        with BuildLine():
            ThreePointArc((-5266.7684051514, 431.2274442911), (-4809.5684051514, 888.4274442911), (-4352.3684051514, 431.2274442911))
            Line((-4352.3684051514, 431.2274442911), (-4352.3684051514, -76.7725557089))
            ThreePointArc((-4352.3684051514, -76.7725557089), (-4809.5684051514, -533.9725557089), (-5266.7684051514, -76.7725557089))
            Line((-5266.7684051514, -76.7725557089), (-5266.7684051514, 431.2274442911))
        make_face(mode=Mode.SUBTRACT)
    extrude(amount=F39_DEPTH)


with BuildPart() as f43:
    # F42 (on face) → F43 (new body)
    with BuildSketch(Plane.XY.offset(25.4)):
        with Locations((1065.4114627128, -482.6)):
            Rectangle(F42_W, F42_H)
    extrude(amount=F43_DEPTH)


with BuildPart() as f45:
    # F44 (on face) → F45 (new body)
    with BuildSketch(Plane.XY.offset(25.4)):
        Polygon((1202.8, 382.8), (508, 382.8), (508, 319.3), (1266.3, 319.3), (1266.3, 1117.6), (1202.8, 1117.6), align=None)
    extrude(amount=F45_DEPTH)


solid = Compound([f1.part, f3.part, f5.part, f11.part, f13.part, f15.part, f17.part, f19.part, f23.part, f25.part, f31.part, f31b.part, f31c.part, f31d.part, f32.part, f32b.part, f32c.part, f32d.part, f37.part, f43.part, f45.part])
